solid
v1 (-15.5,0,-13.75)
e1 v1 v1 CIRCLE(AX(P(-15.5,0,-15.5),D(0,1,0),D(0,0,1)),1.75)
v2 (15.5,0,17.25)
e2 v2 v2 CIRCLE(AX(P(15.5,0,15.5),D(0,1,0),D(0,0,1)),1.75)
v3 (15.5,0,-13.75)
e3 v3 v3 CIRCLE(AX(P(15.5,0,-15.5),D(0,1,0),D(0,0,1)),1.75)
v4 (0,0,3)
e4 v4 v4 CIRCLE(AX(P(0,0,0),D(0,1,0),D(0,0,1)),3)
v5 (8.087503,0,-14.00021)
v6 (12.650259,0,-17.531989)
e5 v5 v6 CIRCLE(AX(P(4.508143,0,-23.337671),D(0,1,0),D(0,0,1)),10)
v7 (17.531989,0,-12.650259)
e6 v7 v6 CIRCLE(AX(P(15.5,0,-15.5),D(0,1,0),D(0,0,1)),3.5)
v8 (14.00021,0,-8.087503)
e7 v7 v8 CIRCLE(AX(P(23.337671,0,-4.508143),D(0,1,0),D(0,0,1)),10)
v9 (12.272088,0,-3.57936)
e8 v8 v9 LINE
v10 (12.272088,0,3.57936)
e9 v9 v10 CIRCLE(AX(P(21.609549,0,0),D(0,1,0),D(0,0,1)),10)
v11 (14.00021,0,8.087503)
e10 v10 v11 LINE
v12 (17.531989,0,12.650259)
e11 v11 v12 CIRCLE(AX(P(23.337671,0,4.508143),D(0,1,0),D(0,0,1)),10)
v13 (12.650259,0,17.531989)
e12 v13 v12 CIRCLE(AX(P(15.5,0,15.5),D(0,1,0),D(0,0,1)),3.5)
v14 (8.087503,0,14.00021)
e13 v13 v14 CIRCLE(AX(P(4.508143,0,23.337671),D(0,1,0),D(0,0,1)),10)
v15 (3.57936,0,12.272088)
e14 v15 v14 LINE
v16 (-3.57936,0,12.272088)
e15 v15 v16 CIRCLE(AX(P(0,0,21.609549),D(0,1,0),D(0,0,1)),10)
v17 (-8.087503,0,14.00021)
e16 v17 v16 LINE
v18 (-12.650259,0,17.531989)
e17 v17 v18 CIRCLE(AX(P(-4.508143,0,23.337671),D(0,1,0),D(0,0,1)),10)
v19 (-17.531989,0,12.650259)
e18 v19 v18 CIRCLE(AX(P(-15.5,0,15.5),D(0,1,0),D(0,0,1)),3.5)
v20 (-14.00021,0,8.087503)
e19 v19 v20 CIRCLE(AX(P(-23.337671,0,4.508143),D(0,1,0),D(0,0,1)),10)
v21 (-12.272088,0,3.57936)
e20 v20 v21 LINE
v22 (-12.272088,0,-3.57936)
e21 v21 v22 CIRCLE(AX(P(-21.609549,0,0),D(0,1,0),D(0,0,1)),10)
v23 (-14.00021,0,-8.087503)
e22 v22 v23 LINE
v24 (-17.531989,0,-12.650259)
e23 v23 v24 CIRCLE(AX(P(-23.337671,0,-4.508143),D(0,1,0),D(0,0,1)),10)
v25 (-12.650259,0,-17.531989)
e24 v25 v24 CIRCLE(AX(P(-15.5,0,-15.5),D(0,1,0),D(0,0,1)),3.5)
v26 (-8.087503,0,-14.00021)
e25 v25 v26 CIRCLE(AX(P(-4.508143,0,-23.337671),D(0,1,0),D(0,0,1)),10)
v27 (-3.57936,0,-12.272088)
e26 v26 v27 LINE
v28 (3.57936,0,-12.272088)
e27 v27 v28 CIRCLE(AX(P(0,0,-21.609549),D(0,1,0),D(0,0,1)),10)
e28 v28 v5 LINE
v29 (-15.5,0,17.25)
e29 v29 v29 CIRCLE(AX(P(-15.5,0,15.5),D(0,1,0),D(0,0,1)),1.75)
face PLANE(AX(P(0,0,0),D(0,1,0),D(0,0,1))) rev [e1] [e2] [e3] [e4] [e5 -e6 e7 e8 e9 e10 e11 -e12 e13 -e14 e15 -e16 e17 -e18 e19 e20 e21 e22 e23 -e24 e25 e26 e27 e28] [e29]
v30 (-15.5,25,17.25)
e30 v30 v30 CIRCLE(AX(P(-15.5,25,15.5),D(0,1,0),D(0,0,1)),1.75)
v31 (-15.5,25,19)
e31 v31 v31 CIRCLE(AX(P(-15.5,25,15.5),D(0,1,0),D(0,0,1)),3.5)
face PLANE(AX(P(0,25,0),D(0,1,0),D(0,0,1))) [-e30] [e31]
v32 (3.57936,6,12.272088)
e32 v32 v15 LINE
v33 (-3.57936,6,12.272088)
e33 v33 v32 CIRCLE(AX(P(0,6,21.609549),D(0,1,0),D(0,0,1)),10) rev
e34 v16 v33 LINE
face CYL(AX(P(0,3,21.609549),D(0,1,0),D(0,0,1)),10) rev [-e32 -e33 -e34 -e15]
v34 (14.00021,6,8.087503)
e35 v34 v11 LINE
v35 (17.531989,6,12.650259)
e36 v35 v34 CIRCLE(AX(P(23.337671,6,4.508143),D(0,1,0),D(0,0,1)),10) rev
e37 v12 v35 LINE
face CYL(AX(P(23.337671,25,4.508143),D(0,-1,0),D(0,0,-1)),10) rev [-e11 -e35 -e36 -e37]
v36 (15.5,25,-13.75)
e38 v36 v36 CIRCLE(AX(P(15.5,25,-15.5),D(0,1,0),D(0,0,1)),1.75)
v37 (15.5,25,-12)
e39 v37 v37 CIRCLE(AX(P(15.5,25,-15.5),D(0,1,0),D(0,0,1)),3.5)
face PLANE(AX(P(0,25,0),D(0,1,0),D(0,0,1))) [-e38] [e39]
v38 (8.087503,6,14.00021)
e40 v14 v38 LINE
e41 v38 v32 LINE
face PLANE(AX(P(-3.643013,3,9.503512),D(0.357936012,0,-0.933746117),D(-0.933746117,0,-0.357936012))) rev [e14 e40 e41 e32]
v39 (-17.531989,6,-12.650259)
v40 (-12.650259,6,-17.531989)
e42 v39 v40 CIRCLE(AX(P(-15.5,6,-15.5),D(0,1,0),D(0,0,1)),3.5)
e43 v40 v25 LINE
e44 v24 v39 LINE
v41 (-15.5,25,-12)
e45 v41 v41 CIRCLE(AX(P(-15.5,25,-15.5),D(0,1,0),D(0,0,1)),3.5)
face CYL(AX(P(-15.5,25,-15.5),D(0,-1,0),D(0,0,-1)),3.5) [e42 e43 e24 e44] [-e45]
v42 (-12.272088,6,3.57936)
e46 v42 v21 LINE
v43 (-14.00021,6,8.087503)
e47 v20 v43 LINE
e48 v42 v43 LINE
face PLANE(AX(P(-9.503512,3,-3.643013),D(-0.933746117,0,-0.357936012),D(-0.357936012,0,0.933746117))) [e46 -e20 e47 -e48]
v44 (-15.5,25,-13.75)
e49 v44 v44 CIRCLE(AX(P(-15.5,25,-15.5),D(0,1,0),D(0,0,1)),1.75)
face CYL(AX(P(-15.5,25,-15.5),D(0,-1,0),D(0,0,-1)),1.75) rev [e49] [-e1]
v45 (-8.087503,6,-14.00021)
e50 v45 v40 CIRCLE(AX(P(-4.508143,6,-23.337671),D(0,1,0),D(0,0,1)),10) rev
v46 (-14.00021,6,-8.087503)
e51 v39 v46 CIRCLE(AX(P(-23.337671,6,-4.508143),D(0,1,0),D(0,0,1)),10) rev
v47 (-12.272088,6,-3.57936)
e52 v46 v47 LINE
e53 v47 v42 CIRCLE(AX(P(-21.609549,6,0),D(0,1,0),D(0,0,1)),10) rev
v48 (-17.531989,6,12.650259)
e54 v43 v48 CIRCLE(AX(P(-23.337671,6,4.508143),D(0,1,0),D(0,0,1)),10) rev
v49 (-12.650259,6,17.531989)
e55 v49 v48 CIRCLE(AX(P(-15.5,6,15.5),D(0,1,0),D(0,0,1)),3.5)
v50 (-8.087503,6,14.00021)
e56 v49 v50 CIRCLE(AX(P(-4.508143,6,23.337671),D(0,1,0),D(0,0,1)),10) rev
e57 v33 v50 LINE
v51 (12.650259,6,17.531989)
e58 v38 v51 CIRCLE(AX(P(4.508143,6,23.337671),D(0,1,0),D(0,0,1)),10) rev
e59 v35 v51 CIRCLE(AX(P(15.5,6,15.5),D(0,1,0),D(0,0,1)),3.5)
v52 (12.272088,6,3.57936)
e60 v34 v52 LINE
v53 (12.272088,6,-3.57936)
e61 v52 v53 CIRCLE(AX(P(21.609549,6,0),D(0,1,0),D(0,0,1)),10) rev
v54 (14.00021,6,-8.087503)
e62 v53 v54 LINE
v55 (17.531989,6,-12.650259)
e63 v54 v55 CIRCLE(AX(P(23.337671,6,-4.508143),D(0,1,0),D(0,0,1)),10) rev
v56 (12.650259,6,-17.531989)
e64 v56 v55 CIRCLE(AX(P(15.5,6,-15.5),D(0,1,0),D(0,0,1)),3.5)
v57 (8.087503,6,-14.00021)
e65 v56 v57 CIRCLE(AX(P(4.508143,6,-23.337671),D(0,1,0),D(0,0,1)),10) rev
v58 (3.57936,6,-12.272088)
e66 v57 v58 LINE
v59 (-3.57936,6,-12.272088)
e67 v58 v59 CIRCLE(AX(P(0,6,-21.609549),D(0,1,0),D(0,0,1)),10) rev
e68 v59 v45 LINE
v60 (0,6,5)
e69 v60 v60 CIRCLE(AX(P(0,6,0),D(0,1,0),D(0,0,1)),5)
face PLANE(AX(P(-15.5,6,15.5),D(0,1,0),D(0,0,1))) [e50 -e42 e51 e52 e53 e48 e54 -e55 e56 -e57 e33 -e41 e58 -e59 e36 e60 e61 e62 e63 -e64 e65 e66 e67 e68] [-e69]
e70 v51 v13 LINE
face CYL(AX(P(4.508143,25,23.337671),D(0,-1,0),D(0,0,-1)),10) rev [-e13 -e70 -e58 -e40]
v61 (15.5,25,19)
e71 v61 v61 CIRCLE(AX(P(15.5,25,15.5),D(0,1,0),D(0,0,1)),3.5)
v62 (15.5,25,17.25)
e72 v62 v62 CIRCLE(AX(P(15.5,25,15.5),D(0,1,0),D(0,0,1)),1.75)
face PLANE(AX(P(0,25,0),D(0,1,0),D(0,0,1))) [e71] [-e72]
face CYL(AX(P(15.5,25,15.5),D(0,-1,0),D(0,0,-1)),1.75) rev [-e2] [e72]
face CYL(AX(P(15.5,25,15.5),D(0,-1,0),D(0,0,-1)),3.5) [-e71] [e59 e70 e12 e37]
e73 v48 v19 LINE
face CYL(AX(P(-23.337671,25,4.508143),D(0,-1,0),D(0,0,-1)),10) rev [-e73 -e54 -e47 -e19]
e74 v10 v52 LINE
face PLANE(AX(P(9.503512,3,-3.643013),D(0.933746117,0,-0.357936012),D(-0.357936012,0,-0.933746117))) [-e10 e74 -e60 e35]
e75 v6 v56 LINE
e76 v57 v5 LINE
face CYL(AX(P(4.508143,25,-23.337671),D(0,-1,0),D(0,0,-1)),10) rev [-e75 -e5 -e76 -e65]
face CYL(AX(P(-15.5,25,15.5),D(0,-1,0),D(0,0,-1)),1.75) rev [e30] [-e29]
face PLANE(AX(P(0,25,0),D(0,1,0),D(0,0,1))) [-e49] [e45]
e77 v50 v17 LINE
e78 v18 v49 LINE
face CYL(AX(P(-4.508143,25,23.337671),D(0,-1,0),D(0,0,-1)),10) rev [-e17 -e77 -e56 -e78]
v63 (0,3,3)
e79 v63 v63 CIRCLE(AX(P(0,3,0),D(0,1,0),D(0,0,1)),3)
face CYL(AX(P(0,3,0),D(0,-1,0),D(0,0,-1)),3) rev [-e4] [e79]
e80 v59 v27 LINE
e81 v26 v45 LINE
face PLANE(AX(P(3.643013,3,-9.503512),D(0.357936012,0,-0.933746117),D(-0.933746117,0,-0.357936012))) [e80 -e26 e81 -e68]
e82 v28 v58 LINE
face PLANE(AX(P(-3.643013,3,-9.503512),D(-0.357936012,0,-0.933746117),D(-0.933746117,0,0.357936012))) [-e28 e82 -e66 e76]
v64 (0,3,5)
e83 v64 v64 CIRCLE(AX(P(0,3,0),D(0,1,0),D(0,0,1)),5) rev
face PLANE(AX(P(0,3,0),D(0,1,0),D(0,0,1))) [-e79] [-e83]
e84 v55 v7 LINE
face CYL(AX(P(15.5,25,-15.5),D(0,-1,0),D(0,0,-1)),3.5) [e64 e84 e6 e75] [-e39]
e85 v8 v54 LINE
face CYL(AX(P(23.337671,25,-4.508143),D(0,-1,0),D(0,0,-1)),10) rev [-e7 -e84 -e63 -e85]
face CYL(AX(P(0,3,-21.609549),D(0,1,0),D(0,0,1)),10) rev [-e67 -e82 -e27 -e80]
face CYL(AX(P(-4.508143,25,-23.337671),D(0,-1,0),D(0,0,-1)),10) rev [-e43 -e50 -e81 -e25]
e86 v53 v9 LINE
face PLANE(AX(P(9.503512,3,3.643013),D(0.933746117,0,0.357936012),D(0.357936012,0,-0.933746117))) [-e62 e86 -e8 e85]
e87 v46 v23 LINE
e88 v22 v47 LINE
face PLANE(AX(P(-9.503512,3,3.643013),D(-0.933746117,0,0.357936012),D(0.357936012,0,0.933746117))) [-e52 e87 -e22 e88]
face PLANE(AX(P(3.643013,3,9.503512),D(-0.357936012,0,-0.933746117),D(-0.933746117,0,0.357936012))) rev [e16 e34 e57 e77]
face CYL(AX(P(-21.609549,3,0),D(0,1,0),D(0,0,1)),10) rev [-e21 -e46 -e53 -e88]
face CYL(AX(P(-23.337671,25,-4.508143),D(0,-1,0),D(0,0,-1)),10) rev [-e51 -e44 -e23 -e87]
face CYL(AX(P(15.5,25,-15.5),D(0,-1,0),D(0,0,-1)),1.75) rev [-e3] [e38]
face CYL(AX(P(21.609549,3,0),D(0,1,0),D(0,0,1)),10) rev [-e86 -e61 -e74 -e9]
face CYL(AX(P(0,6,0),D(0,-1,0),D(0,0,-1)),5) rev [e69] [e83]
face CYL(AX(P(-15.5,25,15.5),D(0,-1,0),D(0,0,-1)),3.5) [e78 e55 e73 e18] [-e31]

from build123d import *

# Parameters (mm, degrees)
SCHIZZO1_R                     = 3.5
SCHIZZO1_R_2                   = 1.75
ESTRUSIONE_ESTRUSIONE1_DEPTH   = 25
ESTRUSIONE_ESTRUSIONE1_2_DEPTH = 25
ESTRUSIONE_ESTRUSIONE1_3_DEPTH = 25
ESTRUSIONE_ESTRUSIONE1_4_DEPTH = 25
SCHIZZO1_3_R                   = 10.9
SCHIZZO1_3_R_2                 = 5
SCHIZZO1_3_R_3                 = 3
ESTRUSIONE_ESTRUSIONE2_DEPTH   = 3
ESTRUSIONE_ESTRUSIONE4_START   = 3
SCHIZZO1_5_R                   = 10.9
SCHIZZO1_5_R_2                 = 5
ESTRUSIONE_ESTRUSIONE4_DEPTH   = 3
RACCORDO1_R                    = 10


with BuildPart() as part:
    # Schizzo1 → Estrusione-Estrusione1 (new body)
    with BuildSketch(Plane(origin=(0, 0, 0), x_dir=(1, 0, 0), z_dir=(0, 1, 0))):
        with Locations(Location((-15.5, -15.5, 0), (0, 0, 270))):
            Circle(SCHIZZO1_R)
        with Locations(Location((-15.5, -15.5, 0), (0, 0, 270))):
            Circle(SCHIZZO1_R_2, mode=Mode.SUBTRACT)
    extrude(amount=ESTRUSIONE_ESTRUSIONE1_DEPTH)



with BuildPart() as body_2:
    # Schizzo1 → Estrusione-Estrusione1 2 (new body)
    with BuildSketch(Plane(origin=(0, 0, 0), x_dir=(1, 0, 0), z_dir=(0, 1, 0))):
        with Locations(Location((-15.5, 15.5, 0), (0, 0, 270))):
            Circle(SCHIZZO1_R)
        with Locations(Location((-15.5, 15.5, 0), (0, 0, 270))):
            Circle(SCHIZZO1_R_2, mode=Mode.SUBTRACT)
    extrude(amount=ESTRUSIONE_ESTRUSIONE1_2_DEPTH)


with BuildPart() as body_3:
    # Schizzo1 → Estrusione-Estrusione1 3 (new body)
    with BuildSketch(Plane(origin=(0, 0, 0), x_dir=(1, 0, 0), z_dir=(0, 1, 0))):
        with Locations(Location((15.5, 15.5, 0), (0, 0, 270))):
            Circle(SCHIZZO1_R)
        with Locations(Location((15.5, 15.5, 0), (0, 0, 270))):
            Circle(SCHIZZO1_R_2, mode=Mode.SUBTRACT)
    extrude(amount=ESTRUSIONE_ESTRUSIONE1_3_DEPTH)


with BuildPart() as body_4:
    # Schizzo1 → Estrusione-Estrusione1 4 (new body)
    with BuildSketch(Plane(origin=(0, 0, 0), x_dir=(1, 0, 0), z_dir=(0, 1, 0))):
        with Locations(Location((15.5, -15.5, 0), (0, 0, 270))):
            Circle(SCHIZZO1_R)
        with Locations(Location((15.5, -15.5, 0), (0, 0, 270))):
            Circle(SCHIZZO1_R_2, mode=Mode.SUBTRACT)
    extrude(amount=ESTRUSIONE_ESTRUSIONE1_4_DEPTH)


with BuildPart() as part_1:
    add(part.part)

    add(body_2.part)  # Estrusione-Estrusione2 merges body 2

    add(body_3.part)  # Estrusione-Estrusione2 merges body 3

    add(body_4.part)  # Estrusione-Estrusione2 merges body 4
    # Schizzo1<3> → Estrusione-Estrusione2 (add)
    # profile 1 of 6: a face of its own
    with BuildSketch(Plane(origin=(0, 0, 0), x_dir=(1, 0, 0), z_dir=(0, 1, 0))):
        with BuildLine():
            Line((-10.9, 0), (-15.5, -12))
            ThreePointArc((-15.5, -12), (-13.025126266, -13.025126266), (-12, -15.5))
            Line((-12, -15.5), (0, -10.9))
            ThreePointArc((0, -10.9), (-7.707463915, -7.707463915), (-10.9, 0))
        make_face()
    # profile 2 of 6: a face of its own
    with BuildSketch(Plane(origin=(0, 0, 0), x_dir=(1, 0, 0), z_dir=(0, 1, 0))):
        with BuildLine():
            ThreePointArc((10.9, 0), (7.707463915, -7.707463915), (0, -10.9))
            Line((0, -10.9), (12, -15.5))
            ThreePointArc((12, -15.5), (13.025126266, -13.025126266), (15.5, -12))
            Line((15.5, -12), (10.9, 0))
        make_face()
    # profile 3 of 6: a face of its own
    with BuildSketch(Plane(origin=(0, 0, 0), x_dir=(1, 0, 0), z_dir=(0, 1, 0))):
        with BuildLine():
            Line((12, 15.5), (0, 10.9))
            ThreePointArc((0, 10.9), (7.707463915, 7.707463915), (10.9, 0))
            Line((10.9, 0), (15.5, 12))
            ThreePointArc((15.5, 12), (13.025126266, 13.025126266), (12, 15.5))
        make_face()
    # profile 4 of 6: a face of its own
    with BuildSketch(Plane(origin=(0, 0, 0), x_dir=(1, 0, 0), z_dir=(0, 1, 0))):
        with BuildLine():
            Line((-15.5, 12), (-10.9, 0))
            ThreePointArc((-10.9, 0), (-7.707463915, 7.707463915), (0, 10.9))
            Line((0, 10.9), (-12, 15.5))
            ThreePointArc((-12, 15.5), (-13.025126266, 13.025126266), (-15.5, 12))
        make_face()
    # profile 5 of 6: a face of its own
    with BuildSketch(Plane(origin=(0, 0, 0), x_dir=(1, 0, 0), z_dir=(0, 1, 0))):
        Circle(SCHIZZO1_3_R)
        Circle(SCHIZZO1_3_R_2, mode=Mode.SUBTRACT)
    # profile 6 of 6: a face of its own
    with BuildSketch(Plane(origin=(0, 0, 0), x_dir=(1, 0, 0), z_dir=(0, 1, 0))):
        Circle(SCHIZZO1_3_R_2)
        with Locations(Location((0, 0, 0), (0, 0, 270))):
            Circle(SCHIZZO1_3_R_3, mode=Mode.SUBTRACT)
    extrude(amount=ESTRUSIONE_ESTRUSIONE2_DEPTH)

    # Schizzo1<5> → Estrusione-Estrusione4 (add)
    # profile 1 of 5: a face of its own
    with BuildSketch(Plane(origin=(0, 0, 0), x_dir=(1, 0, 0), z_dir=(0, 1, 0)).offset(ESTRUSIONE_ESTRUSIONE4_START)):
        Circle(SCHIZZO1_5_R)
        with Locations(Location((0, 0, 0), (0, 0, 270))):
            Circle(SCHIZZO1_5_R_2, mode=Mode.SUBTRACT)
    # profile 2 of 5: a face of its own
    with BuildSketch(Plane(origin=(0, 0, 0), x_dir=(1, 0, 0), z_dir=(0, 1, 0)).offset(ESTRUSIONE_ESTRUSIONE4_START)):
        with BuildLine():
            Line((-10.9, 0), (-15.5, -12))
            ThreePointArc((-15.5, -12), (-13.025126266, -13.025126266), (-12, -15.5))
            Line((-12, -15.5), (0, -10.9))
            ThreePointArc((0, -10.9), (-7.707463915, -7.707463915), (-10.9, 0))
        make_face()
    # profile 3 of 5: a face of its own
    with BuildSketch(Plane(origin=(0, 0, 0), x_dir=(1, 0, 0), z_dir=(0, 1, 0)).offset(ESTRUSIONE_ESTRUSIONE4_START)):
        with BuildLine():
            Line((-15.5, 12), (-10.9, 0))
            ThreePointArc((-10.9, 0), (-7.707463915, 7.707463915), (0, 10.9))
            Line((0, 10.9), (-12, 15.5))
            ThreePointArc((-12, 15.5), (-13.025126266, 13.025126266), (-15.5, 12))
        make_face()
    # profile 4 of 5: a face of its own
    with BuildSketch(Plane(origin=(0, 0, 0), x_dir=(1, 0, 0), z_dir=(0, 1, 0)).offset(ESTRUSIONE_ESTRUSIONE4_START)):
        with BuildLine():
            Line((12, 15.5), (0, 10.9))
            ThreePointArc((0, 10.9), (7.707463915, 7.707463915), (10.9, 0))
            Line((10.9, 0), (15.5, 12))
            ThreePointArc((15.5, 12), (13.025126266, 13.025126266), (12, 15.5))
        make_face()
    # profile 5 of 5: a face of its own
    with BuildSketch(Plane(origin=(0, 0, 0), x_dir=(1, 0, 0), z_dir=(0, 1, 0)).offset(ESTRUSIONE_ESTRUSIONE4_START)):
        with BuildLine():
            ThreePointArc((10.9, 0), (7.707463915, -7.707463915), (0, -10.9))
            Line((0, -10.9), (12, -15.5))
            ThreePointArc((12, -15.5), (13.025126266, -13.025126266), (15.5, -12))
            Line((15.5, -12), (10.9, 0))
        make_face()
    extrude(amount=ESTRUSIONE_ESTRUSIONE4_DEPTH)

    # Raccordo1
    # the kernel refuses this fillet: 10 mm, written as the material it adds along each edge
    with BuildSketch(Plane(origin=(-15.5, 0, 12), x_dir=(0.3579360116324522, 0, -0.9337461173020496), z_dir=(0, 1, 0)), Plane(origin=(15.5, 0, -12), x_dir=(-0.35793601163245214, 0, 0.9337461173020496), z_dir=(0, 1, 0)), Plane(origin=(-12, 0, -15.5), x_dir=(0.9337461173020497, 0, 0.35793601163245176), z_dir=(0, 1, 0))) as raccordo1_piece_1:
        with BuildLine():
            CenterArc((4.190107638, 10), RACCORDO1_R, 236.464010446, 33.535989554)
            ThreePointArc((-1.334499065, 1.66461034), (-0.537321341, 0.936467115), (0, 0))
            Line((0, 0), (4.190107638, 0))
        make_face()
    extrude(amount=6)
    with BuildSketch(Plane(origin=(-12, 0, 15.5), x_dir=(-0.3047854828813613, 0, 0.952421025295418), z_dir=(0, 1, 0)), Plane(origin=(12, 6, 15.5), x_dir=(0.30478548288135804, 0, 0.9524210252954193), z_dir=(0, -1, 0)), Plane(origin=(15.5, 0, 12), x_dir=(0.9524210252954187, 0, 0.3047854828813593), z_dir=(0, 1, 0)), Plane(origin=(12, 0, -15.5), x_dir=(0.30478548288136037, 0, -0.9524210252954185), z_dir=(0, 1, 0)), Plane(origin=(-15.5, 0, -12), x_dir=(-0.952421025295419, 0, -0.304785482881358), z_dir=(0, 1, 0))) as raccordo1_piece_2:
        with BuildLine():
            CenterArc((5.181353209, 9.524210253), RACCORDO1_R, 218.718751934, 33.535989554)
            Line((-2.620904134, 3.269229809), (0, 0))
            ThreePointArc((0, 0), (1.06674919, 0.166526411), (2.13349838, 0))
        make_face()
    extrude(amount=6)
    with BuildSketch(Plane(origin=(0, 6, 10.9), x_dir=(-0.9337461173020492, 0, 0.3579360116324534), z_dir=(0, -1, 0))) as raccordo1_piece_3:
        with BuildLine():
            CenterArc((RACCORDO1_R * 0.383333333333, -RACCORDO1_R), RACCORDO1_R, 90, 41.946986843)
            Line((-RACCORDO1_R * 0.285109388875, -RACCORDO1_R * 0.256236376847), (0, 0))
            Line((0, 0), (RACCORDO1_R * 0.383333333333, 0))
        make_face()
    extrude(amount=6)
    with BuildSketch(Plane(origin=(10.9, 0, 0), x_dir=(0.35793601163245314, 0, 0.9337461173020493), z_dir=(0, 1, 0)), Plane(origin=(0, 0, -10.9), x_dir=(0.9337461173020492, 0, -0.3579360116324533), z_dir=(0, 1, 0)), Plane(origin=(-10.9, 0, 0), x_dir=(-0.3579360116324529, 0, -0.9337461173020494), z_dir=(0, 1, 0))) as raccordo1_piece_4:
        with BuildLine():
            CenterArc((RACCORDO1_R * 0.383333333333, RACCORDO1_R), RACCORDO1_R, 228.053013157, 41.946986843)
            Line((-RACCORDO1_R * 0.285109388875, RACCORDO1_R * 0.256236376847), (0, 0))
            Line((0, 0), (RACCORDO1_R * 0.383333333333, 0))
        make_face()
    extrude(amount=6)


solid = part_1.part
